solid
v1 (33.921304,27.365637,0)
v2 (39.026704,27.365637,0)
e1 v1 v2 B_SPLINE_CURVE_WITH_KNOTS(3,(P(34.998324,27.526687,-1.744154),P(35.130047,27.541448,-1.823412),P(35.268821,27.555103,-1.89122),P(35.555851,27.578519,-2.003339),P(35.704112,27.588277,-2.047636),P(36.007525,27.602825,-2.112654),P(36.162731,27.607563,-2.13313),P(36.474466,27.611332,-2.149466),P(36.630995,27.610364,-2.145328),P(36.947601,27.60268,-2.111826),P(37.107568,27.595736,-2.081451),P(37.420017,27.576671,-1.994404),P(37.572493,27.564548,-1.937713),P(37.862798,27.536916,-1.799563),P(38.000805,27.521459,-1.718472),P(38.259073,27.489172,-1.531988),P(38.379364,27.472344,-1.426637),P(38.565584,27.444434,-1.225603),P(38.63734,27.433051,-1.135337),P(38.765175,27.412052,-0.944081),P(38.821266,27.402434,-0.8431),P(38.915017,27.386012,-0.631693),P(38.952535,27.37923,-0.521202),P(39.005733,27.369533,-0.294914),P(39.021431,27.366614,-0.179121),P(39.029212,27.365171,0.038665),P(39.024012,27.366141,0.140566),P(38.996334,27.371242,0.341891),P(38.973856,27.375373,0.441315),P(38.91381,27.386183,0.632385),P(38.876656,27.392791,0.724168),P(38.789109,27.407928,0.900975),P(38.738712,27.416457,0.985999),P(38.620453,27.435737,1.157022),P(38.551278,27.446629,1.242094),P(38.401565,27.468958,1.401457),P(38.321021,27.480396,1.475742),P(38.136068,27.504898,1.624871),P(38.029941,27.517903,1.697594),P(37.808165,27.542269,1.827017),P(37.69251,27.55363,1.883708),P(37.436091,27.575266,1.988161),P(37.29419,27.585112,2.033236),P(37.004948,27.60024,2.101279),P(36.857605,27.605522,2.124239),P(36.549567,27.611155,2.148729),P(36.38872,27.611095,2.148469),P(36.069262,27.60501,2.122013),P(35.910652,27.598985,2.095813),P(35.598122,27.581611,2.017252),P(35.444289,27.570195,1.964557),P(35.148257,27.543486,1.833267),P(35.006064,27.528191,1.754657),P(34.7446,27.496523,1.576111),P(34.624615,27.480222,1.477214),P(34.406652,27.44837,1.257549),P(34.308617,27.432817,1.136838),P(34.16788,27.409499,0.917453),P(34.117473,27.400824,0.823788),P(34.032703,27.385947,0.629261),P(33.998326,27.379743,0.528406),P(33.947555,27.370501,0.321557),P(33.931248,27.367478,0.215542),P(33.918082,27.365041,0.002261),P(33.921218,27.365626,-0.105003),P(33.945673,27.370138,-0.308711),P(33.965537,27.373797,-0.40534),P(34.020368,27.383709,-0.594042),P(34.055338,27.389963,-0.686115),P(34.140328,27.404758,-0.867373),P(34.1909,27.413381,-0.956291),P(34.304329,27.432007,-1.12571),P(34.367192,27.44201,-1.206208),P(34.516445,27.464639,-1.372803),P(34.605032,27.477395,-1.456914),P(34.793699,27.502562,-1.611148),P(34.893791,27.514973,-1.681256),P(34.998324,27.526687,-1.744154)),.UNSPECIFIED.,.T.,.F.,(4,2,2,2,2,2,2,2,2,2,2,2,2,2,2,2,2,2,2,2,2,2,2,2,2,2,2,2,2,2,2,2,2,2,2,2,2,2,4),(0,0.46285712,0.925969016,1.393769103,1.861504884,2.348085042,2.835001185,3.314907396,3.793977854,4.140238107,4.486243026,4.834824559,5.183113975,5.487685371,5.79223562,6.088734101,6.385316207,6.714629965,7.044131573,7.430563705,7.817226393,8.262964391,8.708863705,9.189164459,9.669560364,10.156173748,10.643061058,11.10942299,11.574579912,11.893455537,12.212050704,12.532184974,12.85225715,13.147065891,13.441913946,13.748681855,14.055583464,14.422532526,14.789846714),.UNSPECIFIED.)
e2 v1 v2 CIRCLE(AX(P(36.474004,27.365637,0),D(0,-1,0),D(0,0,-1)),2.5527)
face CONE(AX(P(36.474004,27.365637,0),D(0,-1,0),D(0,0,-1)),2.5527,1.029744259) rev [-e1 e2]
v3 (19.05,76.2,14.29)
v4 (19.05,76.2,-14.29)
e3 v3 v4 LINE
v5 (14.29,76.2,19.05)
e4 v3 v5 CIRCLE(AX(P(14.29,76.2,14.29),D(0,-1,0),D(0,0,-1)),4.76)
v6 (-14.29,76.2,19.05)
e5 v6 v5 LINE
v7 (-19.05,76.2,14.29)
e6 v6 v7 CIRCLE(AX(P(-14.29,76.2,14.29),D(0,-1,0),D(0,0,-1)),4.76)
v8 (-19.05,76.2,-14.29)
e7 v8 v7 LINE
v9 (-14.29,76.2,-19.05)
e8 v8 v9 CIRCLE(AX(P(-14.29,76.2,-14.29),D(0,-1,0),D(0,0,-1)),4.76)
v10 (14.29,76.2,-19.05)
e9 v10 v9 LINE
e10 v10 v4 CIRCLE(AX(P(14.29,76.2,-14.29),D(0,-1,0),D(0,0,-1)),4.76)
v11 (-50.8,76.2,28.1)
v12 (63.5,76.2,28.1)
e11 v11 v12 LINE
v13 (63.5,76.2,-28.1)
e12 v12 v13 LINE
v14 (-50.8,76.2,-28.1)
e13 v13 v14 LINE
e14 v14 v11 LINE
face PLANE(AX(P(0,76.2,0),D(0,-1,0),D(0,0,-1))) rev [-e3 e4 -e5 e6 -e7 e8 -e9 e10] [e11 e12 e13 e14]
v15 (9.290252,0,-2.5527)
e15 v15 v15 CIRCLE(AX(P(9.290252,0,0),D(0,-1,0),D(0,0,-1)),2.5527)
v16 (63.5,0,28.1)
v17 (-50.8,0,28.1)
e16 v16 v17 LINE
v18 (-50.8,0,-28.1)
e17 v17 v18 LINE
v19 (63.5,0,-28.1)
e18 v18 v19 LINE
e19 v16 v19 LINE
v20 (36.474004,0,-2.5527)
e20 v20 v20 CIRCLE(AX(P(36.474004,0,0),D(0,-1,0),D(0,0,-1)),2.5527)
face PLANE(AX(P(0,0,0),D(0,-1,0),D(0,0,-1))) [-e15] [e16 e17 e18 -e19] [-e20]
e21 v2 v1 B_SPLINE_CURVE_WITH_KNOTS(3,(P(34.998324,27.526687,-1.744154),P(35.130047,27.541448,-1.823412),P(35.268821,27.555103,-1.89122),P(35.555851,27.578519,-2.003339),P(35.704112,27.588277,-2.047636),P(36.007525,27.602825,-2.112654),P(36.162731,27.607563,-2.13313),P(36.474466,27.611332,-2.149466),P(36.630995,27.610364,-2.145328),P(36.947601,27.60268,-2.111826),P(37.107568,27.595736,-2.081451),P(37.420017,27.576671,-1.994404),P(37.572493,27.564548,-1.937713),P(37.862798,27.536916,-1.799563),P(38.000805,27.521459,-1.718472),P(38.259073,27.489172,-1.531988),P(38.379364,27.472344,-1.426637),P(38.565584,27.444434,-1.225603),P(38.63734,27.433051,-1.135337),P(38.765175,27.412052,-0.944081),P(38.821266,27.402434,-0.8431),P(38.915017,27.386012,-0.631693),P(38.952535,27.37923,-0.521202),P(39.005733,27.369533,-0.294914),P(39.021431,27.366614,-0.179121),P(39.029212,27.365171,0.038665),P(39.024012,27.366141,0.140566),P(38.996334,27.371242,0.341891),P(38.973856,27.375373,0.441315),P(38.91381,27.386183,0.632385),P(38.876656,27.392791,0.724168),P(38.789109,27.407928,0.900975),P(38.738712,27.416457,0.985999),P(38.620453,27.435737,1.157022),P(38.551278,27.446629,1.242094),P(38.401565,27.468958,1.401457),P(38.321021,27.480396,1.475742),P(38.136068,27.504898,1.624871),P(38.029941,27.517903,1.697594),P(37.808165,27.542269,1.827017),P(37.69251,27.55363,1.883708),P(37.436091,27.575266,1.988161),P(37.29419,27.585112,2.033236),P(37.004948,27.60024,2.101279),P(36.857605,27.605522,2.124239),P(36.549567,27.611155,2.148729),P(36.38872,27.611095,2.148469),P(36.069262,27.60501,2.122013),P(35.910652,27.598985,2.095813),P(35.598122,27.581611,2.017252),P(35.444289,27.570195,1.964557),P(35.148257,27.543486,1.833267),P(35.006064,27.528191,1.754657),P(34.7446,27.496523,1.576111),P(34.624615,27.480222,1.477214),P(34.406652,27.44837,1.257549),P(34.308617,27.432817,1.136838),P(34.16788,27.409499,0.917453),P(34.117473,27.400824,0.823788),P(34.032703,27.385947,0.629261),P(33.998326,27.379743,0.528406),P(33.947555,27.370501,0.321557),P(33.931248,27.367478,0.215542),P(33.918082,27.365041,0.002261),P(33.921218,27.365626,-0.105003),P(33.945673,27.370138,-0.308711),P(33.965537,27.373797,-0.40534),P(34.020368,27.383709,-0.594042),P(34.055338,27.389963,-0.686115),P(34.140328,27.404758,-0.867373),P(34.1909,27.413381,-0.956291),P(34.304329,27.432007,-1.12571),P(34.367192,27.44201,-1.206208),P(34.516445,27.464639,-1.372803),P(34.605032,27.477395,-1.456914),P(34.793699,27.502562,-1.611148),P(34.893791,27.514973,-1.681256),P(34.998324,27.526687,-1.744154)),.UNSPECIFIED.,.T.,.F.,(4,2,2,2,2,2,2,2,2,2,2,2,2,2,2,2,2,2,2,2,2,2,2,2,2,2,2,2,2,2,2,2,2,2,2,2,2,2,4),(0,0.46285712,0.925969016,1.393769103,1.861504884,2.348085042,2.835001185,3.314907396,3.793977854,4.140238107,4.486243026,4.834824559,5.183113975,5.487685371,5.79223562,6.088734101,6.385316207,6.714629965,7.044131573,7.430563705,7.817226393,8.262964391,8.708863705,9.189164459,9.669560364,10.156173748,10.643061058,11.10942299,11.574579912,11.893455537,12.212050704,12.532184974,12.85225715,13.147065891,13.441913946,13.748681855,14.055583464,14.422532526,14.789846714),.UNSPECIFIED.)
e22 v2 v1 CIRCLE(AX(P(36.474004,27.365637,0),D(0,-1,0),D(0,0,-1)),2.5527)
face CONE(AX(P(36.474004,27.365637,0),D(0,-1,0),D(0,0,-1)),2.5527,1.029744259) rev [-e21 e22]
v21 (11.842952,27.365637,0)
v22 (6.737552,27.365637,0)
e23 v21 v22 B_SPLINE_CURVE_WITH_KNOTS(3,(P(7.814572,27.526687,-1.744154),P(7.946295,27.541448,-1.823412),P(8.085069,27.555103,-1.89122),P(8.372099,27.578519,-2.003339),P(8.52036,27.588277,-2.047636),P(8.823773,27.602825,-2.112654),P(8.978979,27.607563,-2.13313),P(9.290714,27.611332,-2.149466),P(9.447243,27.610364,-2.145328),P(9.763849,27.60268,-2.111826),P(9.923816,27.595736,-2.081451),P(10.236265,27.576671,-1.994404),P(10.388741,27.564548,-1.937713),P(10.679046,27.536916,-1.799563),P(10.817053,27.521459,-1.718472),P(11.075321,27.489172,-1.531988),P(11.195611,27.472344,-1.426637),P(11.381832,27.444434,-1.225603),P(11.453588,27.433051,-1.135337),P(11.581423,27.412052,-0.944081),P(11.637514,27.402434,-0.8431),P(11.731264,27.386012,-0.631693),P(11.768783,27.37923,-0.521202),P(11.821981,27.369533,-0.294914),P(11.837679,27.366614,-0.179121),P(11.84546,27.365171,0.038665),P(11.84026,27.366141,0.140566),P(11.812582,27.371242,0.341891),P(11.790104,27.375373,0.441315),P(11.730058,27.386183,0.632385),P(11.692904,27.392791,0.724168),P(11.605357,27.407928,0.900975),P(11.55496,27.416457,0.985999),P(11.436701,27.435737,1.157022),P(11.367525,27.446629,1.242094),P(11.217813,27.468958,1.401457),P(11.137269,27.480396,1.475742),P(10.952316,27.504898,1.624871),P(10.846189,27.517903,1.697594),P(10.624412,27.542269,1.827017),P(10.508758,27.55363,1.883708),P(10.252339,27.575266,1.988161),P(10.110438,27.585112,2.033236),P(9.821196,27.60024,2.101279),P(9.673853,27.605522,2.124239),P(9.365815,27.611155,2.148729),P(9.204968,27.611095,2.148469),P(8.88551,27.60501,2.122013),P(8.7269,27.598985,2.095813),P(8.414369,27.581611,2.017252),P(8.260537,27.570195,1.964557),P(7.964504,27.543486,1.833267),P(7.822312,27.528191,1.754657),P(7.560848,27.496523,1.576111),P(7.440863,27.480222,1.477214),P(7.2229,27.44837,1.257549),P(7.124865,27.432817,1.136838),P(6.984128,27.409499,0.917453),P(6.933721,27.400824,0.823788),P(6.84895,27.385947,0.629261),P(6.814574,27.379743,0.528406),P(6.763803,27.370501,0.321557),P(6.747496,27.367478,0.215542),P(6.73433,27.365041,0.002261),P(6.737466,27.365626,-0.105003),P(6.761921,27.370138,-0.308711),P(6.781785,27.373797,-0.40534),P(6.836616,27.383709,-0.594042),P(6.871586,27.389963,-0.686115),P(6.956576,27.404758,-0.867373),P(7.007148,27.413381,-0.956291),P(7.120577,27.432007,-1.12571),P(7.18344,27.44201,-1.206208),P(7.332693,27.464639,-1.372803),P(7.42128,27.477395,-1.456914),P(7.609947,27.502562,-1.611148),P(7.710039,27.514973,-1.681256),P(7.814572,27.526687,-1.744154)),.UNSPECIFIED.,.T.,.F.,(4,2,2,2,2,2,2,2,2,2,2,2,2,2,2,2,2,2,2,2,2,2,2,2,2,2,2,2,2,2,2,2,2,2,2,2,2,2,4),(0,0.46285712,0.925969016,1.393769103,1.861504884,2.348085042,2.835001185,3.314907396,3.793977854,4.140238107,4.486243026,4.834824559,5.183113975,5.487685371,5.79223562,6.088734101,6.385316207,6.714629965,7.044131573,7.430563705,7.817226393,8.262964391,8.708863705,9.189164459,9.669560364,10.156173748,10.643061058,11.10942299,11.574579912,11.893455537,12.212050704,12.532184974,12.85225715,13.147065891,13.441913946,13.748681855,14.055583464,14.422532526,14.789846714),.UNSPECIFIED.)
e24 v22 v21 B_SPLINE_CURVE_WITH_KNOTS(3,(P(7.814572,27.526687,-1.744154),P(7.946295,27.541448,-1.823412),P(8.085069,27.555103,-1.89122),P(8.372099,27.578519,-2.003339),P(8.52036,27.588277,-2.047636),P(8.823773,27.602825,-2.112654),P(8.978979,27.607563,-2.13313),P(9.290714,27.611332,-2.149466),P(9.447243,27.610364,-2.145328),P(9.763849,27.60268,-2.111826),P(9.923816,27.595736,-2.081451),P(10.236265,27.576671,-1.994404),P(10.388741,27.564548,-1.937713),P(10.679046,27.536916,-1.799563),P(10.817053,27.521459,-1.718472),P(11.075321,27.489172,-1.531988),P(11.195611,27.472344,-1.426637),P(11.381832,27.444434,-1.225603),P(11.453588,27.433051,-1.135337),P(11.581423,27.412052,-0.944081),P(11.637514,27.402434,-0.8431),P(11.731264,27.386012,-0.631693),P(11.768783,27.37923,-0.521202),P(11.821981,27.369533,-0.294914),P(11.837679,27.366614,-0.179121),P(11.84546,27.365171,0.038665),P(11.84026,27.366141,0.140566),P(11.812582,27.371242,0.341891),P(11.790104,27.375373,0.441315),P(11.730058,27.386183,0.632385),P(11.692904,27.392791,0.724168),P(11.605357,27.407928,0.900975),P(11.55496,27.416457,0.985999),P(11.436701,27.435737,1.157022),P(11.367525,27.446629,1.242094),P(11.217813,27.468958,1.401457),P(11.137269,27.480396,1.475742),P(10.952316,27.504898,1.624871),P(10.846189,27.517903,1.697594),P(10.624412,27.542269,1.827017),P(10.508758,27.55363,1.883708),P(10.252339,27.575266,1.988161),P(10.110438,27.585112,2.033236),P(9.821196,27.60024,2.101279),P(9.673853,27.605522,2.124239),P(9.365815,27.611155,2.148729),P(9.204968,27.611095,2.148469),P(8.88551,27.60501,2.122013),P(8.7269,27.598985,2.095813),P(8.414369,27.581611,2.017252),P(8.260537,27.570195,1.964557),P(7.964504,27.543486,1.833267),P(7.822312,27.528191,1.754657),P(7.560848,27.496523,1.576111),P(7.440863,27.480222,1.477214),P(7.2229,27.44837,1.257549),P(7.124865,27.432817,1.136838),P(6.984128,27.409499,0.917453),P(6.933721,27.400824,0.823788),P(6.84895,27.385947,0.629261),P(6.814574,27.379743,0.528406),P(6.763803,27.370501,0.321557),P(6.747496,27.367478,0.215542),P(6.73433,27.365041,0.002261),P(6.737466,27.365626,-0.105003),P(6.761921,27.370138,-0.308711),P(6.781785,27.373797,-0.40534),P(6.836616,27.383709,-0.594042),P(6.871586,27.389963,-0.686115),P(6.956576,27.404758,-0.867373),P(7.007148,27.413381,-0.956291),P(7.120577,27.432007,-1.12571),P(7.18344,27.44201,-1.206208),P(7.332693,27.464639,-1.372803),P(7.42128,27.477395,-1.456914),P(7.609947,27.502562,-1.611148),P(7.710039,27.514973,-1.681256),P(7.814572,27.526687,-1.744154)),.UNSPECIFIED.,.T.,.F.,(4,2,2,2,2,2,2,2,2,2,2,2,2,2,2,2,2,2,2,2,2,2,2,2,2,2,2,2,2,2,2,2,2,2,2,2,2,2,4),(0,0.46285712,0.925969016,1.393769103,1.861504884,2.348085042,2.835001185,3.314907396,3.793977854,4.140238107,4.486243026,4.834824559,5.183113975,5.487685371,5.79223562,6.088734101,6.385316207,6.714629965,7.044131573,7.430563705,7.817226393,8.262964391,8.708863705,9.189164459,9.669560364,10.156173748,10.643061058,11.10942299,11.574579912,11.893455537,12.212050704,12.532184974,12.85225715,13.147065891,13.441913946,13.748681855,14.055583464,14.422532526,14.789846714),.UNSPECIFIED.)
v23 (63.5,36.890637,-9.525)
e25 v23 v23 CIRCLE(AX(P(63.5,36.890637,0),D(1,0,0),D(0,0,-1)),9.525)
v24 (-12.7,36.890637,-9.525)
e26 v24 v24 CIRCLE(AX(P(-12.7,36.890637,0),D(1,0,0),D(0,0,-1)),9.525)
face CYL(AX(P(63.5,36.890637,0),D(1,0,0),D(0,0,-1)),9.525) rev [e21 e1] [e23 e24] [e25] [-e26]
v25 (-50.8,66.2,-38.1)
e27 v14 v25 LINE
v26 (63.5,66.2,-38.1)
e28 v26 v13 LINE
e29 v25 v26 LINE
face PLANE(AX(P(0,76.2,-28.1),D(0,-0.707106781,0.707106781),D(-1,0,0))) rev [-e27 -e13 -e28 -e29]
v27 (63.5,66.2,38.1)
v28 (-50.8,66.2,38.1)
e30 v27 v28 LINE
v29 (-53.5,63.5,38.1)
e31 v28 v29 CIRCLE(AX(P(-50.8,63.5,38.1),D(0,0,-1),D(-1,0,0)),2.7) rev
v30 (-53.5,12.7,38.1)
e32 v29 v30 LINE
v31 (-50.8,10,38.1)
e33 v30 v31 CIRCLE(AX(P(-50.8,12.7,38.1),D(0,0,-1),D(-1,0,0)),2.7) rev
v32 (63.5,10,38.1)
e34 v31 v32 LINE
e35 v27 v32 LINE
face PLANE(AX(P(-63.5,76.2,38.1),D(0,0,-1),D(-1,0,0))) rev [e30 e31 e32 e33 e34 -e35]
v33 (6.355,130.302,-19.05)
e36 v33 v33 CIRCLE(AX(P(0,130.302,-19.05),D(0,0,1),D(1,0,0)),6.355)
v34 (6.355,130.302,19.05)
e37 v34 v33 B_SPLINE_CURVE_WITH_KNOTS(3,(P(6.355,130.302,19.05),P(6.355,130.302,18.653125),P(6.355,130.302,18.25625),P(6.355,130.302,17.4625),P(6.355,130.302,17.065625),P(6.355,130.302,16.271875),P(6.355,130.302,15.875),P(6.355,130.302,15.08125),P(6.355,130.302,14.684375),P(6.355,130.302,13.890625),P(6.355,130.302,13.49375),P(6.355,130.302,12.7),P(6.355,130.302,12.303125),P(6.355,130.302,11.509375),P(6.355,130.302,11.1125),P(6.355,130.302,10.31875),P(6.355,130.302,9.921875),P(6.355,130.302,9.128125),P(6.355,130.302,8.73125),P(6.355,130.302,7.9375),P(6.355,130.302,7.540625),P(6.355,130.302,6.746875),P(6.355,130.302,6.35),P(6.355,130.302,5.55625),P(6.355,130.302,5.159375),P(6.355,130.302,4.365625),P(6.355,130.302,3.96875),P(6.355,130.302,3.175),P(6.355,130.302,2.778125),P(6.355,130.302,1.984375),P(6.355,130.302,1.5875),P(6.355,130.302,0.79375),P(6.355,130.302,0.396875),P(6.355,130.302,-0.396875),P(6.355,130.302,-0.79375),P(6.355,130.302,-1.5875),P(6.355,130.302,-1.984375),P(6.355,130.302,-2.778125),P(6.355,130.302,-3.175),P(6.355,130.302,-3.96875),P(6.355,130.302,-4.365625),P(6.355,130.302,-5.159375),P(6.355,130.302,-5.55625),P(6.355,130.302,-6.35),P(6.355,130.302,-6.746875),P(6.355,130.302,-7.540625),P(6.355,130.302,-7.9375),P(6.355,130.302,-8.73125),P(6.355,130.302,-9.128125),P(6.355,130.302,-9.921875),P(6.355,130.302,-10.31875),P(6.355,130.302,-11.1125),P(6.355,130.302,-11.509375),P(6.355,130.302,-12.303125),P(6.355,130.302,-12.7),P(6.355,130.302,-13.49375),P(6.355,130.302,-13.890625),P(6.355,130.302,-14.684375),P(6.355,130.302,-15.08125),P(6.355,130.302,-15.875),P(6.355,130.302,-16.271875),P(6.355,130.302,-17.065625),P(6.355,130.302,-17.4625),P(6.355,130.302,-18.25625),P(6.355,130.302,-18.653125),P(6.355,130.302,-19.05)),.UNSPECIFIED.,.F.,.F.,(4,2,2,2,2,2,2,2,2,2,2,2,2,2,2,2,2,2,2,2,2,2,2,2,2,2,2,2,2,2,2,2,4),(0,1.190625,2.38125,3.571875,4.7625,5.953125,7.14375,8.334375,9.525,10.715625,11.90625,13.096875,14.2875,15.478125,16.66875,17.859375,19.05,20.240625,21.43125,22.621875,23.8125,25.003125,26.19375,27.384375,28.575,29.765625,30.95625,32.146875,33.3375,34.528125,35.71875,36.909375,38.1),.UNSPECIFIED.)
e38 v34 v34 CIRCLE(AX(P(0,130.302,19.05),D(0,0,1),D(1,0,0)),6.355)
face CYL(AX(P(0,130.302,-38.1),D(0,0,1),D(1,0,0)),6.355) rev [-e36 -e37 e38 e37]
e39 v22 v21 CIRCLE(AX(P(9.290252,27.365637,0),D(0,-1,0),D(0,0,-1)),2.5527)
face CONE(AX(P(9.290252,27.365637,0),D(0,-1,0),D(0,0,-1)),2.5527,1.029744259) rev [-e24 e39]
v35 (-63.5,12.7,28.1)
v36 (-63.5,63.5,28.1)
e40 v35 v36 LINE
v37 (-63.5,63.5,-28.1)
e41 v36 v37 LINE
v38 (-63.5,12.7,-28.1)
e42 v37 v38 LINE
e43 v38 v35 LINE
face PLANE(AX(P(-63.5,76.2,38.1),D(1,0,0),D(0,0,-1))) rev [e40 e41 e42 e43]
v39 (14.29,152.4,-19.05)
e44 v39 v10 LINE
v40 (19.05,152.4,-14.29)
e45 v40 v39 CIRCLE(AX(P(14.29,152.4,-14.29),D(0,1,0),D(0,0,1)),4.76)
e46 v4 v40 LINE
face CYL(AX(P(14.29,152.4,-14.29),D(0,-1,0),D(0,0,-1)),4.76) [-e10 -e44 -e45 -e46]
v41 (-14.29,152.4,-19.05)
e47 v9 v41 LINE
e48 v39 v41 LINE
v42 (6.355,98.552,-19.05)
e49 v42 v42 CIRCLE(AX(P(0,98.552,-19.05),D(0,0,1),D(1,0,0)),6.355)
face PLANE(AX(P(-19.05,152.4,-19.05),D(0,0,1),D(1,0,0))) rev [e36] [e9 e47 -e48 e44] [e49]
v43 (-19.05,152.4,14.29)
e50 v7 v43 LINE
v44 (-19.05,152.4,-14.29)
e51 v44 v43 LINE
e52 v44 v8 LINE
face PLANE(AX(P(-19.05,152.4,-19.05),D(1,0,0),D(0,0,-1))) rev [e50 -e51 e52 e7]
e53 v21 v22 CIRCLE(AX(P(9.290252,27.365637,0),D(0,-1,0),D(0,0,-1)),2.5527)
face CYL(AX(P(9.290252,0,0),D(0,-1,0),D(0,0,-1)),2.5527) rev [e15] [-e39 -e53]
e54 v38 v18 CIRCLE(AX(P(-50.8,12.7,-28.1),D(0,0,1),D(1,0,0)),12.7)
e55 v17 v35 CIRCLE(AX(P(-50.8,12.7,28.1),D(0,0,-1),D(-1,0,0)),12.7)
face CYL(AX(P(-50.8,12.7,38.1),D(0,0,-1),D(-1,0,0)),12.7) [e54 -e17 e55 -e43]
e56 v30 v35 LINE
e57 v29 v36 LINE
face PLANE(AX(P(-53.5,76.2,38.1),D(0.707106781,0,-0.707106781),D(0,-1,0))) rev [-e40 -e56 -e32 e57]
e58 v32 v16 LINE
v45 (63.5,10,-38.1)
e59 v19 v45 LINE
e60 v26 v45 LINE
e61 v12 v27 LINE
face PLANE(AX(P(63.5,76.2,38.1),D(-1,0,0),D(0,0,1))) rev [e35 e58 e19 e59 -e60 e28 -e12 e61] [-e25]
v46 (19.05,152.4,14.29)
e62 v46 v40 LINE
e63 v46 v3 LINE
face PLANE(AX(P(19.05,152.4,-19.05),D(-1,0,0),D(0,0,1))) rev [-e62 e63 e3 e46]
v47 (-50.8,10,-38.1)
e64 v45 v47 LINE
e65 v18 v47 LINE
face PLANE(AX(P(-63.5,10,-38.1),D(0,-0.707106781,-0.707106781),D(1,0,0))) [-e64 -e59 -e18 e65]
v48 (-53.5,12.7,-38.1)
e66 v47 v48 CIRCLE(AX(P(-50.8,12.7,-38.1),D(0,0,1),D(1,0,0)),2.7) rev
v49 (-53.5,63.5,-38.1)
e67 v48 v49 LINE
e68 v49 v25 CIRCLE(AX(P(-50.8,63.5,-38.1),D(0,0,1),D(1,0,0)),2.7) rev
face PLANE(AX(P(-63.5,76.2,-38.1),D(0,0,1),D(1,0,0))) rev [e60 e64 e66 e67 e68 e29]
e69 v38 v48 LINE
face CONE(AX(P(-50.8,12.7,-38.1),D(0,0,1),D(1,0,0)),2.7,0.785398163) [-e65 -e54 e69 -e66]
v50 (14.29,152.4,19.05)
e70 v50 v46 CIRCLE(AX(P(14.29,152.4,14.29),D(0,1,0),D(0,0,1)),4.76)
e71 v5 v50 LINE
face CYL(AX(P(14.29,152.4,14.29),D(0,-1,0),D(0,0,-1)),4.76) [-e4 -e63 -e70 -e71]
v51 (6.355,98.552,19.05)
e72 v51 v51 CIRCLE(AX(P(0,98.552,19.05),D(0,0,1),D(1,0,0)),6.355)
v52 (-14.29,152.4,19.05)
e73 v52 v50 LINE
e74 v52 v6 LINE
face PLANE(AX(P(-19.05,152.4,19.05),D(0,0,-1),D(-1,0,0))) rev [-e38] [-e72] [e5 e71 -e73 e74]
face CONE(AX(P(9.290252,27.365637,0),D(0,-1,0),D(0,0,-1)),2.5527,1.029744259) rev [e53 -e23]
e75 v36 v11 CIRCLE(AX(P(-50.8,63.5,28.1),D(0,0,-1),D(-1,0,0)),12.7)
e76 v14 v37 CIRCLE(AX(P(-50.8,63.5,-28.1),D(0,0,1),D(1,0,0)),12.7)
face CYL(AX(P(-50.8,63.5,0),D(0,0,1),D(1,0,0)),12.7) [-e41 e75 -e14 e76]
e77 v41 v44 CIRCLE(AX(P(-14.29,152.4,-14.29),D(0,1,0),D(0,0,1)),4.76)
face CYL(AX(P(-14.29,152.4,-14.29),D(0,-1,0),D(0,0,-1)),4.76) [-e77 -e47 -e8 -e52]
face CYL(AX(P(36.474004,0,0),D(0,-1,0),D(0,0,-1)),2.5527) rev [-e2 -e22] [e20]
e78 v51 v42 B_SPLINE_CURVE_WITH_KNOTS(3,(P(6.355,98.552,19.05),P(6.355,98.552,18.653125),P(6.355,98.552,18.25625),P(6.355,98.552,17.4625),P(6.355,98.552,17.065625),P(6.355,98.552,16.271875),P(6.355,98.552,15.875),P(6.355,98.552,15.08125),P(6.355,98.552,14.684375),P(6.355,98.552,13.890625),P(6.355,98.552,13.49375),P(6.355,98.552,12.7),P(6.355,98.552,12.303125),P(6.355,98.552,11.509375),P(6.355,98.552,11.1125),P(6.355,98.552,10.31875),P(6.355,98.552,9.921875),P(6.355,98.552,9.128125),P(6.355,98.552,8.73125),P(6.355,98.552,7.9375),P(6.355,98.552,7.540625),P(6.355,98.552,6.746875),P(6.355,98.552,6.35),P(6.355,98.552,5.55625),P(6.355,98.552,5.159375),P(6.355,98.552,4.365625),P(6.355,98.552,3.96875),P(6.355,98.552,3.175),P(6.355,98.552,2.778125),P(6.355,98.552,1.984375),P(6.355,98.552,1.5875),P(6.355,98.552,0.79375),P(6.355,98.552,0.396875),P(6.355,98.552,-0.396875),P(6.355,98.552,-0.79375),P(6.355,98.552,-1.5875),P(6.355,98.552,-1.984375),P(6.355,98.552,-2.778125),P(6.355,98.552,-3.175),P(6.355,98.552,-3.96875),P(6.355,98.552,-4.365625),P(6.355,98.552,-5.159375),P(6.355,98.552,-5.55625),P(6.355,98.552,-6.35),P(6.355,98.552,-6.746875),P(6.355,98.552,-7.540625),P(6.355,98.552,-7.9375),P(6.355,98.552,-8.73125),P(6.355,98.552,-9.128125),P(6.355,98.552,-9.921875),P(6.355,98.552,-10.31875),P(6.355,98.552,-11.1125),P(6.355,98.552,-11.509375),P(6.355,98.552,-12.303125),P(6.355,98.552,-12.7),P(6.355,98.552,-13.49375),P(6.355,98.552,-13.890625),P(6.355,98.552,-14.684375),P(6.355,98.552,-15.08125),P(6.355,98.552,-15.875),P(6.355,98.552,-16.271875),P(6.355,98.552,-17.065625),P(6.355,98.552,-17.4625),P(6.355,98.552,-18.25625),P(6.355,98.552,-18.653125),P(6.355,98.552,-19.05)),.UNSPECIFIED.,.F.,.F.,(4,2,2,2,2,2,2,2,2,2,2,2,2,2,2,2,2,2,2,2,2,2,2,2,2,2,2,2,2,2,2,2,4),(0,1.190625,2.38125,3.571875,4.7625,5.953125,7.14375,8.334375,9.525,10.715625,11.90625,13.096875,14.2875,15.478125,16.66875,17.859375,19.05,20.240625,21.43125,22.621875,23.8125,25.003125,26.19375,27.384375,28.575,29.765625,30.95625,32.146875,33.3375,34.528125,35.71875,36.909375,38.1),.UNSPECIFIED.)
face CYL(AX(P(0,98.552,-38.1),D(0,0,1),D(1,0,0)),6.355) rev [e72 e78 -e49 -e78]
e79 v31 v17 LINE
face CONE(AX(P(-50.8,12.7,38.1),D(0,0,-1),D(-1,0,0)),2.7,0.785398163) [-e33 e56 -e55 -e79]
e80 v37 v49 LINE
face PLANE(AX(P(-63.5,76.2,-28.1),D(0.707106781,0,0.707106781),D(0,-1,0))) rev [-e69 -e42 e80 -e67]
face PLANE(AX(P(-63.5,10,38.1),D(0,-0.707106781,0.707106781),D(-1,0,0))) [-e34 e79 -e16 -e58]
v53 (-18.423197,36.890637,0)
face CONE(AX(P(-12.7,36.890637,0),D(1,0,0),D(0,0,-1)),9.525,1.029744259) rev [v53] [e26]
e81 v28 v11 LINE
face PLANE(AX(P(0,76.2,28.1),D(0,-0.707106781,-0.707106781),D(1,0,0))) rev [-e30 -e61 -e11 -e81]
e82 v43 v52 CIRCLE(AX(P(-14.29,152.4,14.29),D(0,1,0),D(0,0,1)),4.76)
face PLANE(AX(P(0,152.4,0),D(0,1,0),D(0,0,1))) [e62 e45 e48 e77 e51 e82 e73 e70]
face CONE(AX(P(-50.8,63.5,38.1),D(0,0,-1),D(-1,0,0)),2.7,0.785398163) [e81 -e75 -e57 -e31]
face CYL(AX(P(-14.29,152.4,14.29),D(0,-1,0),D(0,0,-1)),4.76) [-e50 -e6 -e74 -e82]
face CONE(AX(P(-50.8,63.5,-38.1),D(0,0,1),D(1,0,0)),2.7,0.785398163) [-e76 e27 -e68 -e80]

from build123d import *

# Parameters (mm, degrees)
SKETCH2_W                      = 127
SKETCH2_H                      = 76.2
BOSS_EXTRUDE2_DEPTH            = 76.2
FILLET1_R                      = 12.7
CHAMFER1_SIZE                  = 10
F_3_4_0_7500_DOWEL_HOLE1_D     = 19.05
F_3_4_0_7500_DOWEL_HOLE1_DEPTH = 76.2
F_3_4_0_7500_DOWEL_HOLE1_TIP   = 5.723197396
SKETCH9_W                      = 38.1
SKETCH9_H                      = 38.1
BOSS_EXTRUDE3_DEPTH            = 76.2
SKETCH10_R                     = 6.355
CUT_EXTRUDE1_DEPTH             = 175.711569487
FILLET3_R                      = 4.76


# Read off the part's stored shape, not the designer's step: 1/4-20 Tapped Hole1
with BuildPart() as part:
    # Sketch2 → Boss-Extrude2 (new body)
    with BuildSketch(Plane(origin=(0, 0, 0), x_dir=(1, 0, 0), z_dir=(0, 1, 0))):
        Rectangle(SKETCH2_W, SKETCH2_H)
    extrude(amount=BOSS_EXTRUDE2_DEPTH)

    # Fillet1
    fillet1_edges = [part.edges().sort_by_distance(p)[0] for p in [
        (-63.5, 76.2, 0),
        (-63.5, 0, 0),
    ]]
    fillet(fillet1_edges, radius=FILLET1_R)

    # Chamfer1
    chamfer1_edges = [part.edges().sort_by_distance(p)[0] for p in [
        (-63.5, 38.1, 38.1),
        (-63.5, 38.1, -38.1),
        (6.35, 0, 38.1),
        (6.35, 76.2, 38.1),
        (-59.780256121, 72.480256121, 38.1),
        (-59.780256121, 3.719743879, 38.1),
        (-59.780256121, 72.480256121, -38.1),
        (-59.780256121, 3.719743879, -38.1),
        (6.35, 0, -38.1),
        (6.35, 76.2, -38.1),
    ]]
    chamfer(chamfer1_edges, length=CHAMFER1_SIZE)

    # 3/4 (0.7500) Dowel Hole1
    with Locations(Plane(origin=(63.5, 0, 0), x_dir=(0, 0, -1), z_dir=(1, 0, 0))):
        with Locations((0, 36.890636669)):
            Hole(F_3_4_0_7500_DOWEL_HOLE1_D / 2, depth=F_3_4_0_7500_DOWEL_HOLE1_DEPTH)
            with Locations((0, 0, -(F_3_4_0_7500_DOWEL_HOLE1_DEPTH + F_3_4_0_7500_DOWEL_HOLE1_TIP / 2))):  # 118° drill point
                Cone(0, F_3_4_0_7500_DOWEL_HOLE1_D / 2, F_3_4_0_7500_DOWEL_HOLE1_TIP, mode=Mode.SUBTRACT)

    # 1/4-20 Tapped Hole1 outline → 1/4-20 Tapped Hole1 (revolve, cut)
    with BuildSketch(Plane(origin=(9.290251981, 0, 0), x_dir=(1, 0, 0), z_dir=(0, 0, 1))):
        Polygon((2.5527, 0), (2.5527, 27.365636669), (2.145213678, 27.610479152), (0, 27.610479152), (0, 0), align=None)
    revolve(axis=Axis((9.290251981, 0, 0), (0, 1, 0)), mode=Mode.SUBTRACT)

    # 1_4-20 Tapped Hole1 2 outline → 1_4-20 Tapped Hole1 2 (revolve, cut)
    with BuildSketch(Plane(origin=(36.474004082, 0, 0), x_dir=(1, 0, 0), z_dir=(0, 0, 1))):
        Polygon((2.5527, 0), (2.5527, 27.365636669), (2.145213678, 27.610479152), (0, 27.610479152), (0, 0), align=None)
    revolve(axis=Axis((36.474004082, 0, 0), (0, 1, 0)), mode=Mode.SUBTRACT)

    # Sketch9 → Boss-Extrude3 (add)
    with BuildSketch(Plane(origin=(0, 76.2, 0), x_dir=(1, 0, 0), z_dir=(0, 1, 0))):
        Rectangle(SKETCH9_W, SKETCH9_H)
    extrude(amount=BOSS_EXTRUDE3_DEPTH)

    # Sketch10 → Cut-Extrude1 (cut, through all)
    with BuildSketch(Plane.XY.offset(19.05)):
        with Locations((0, 98.552)):
            Circle(SKETCH10_R)
        with Locations((0, 130.302)):
            Circle(SKETCH10_R)
    extrude(amount=-CUT_EXTRUDE1_DEPTH, mode=Mode.SUBTRACT)

    # Fillet3
    fillet3_edges = [part.edges().sort_by_distance(p)[0] for p in [
        (19.05, 114.3, 19.05),
        (19.05, 114.3, -19.05),
        (-19.05, 114.3, -19.05),
        (-19.05, 114.3, 19.05),
    ]]
    fillet(fillet3_edges, radius=FILLET3_R)


solid = part.part
